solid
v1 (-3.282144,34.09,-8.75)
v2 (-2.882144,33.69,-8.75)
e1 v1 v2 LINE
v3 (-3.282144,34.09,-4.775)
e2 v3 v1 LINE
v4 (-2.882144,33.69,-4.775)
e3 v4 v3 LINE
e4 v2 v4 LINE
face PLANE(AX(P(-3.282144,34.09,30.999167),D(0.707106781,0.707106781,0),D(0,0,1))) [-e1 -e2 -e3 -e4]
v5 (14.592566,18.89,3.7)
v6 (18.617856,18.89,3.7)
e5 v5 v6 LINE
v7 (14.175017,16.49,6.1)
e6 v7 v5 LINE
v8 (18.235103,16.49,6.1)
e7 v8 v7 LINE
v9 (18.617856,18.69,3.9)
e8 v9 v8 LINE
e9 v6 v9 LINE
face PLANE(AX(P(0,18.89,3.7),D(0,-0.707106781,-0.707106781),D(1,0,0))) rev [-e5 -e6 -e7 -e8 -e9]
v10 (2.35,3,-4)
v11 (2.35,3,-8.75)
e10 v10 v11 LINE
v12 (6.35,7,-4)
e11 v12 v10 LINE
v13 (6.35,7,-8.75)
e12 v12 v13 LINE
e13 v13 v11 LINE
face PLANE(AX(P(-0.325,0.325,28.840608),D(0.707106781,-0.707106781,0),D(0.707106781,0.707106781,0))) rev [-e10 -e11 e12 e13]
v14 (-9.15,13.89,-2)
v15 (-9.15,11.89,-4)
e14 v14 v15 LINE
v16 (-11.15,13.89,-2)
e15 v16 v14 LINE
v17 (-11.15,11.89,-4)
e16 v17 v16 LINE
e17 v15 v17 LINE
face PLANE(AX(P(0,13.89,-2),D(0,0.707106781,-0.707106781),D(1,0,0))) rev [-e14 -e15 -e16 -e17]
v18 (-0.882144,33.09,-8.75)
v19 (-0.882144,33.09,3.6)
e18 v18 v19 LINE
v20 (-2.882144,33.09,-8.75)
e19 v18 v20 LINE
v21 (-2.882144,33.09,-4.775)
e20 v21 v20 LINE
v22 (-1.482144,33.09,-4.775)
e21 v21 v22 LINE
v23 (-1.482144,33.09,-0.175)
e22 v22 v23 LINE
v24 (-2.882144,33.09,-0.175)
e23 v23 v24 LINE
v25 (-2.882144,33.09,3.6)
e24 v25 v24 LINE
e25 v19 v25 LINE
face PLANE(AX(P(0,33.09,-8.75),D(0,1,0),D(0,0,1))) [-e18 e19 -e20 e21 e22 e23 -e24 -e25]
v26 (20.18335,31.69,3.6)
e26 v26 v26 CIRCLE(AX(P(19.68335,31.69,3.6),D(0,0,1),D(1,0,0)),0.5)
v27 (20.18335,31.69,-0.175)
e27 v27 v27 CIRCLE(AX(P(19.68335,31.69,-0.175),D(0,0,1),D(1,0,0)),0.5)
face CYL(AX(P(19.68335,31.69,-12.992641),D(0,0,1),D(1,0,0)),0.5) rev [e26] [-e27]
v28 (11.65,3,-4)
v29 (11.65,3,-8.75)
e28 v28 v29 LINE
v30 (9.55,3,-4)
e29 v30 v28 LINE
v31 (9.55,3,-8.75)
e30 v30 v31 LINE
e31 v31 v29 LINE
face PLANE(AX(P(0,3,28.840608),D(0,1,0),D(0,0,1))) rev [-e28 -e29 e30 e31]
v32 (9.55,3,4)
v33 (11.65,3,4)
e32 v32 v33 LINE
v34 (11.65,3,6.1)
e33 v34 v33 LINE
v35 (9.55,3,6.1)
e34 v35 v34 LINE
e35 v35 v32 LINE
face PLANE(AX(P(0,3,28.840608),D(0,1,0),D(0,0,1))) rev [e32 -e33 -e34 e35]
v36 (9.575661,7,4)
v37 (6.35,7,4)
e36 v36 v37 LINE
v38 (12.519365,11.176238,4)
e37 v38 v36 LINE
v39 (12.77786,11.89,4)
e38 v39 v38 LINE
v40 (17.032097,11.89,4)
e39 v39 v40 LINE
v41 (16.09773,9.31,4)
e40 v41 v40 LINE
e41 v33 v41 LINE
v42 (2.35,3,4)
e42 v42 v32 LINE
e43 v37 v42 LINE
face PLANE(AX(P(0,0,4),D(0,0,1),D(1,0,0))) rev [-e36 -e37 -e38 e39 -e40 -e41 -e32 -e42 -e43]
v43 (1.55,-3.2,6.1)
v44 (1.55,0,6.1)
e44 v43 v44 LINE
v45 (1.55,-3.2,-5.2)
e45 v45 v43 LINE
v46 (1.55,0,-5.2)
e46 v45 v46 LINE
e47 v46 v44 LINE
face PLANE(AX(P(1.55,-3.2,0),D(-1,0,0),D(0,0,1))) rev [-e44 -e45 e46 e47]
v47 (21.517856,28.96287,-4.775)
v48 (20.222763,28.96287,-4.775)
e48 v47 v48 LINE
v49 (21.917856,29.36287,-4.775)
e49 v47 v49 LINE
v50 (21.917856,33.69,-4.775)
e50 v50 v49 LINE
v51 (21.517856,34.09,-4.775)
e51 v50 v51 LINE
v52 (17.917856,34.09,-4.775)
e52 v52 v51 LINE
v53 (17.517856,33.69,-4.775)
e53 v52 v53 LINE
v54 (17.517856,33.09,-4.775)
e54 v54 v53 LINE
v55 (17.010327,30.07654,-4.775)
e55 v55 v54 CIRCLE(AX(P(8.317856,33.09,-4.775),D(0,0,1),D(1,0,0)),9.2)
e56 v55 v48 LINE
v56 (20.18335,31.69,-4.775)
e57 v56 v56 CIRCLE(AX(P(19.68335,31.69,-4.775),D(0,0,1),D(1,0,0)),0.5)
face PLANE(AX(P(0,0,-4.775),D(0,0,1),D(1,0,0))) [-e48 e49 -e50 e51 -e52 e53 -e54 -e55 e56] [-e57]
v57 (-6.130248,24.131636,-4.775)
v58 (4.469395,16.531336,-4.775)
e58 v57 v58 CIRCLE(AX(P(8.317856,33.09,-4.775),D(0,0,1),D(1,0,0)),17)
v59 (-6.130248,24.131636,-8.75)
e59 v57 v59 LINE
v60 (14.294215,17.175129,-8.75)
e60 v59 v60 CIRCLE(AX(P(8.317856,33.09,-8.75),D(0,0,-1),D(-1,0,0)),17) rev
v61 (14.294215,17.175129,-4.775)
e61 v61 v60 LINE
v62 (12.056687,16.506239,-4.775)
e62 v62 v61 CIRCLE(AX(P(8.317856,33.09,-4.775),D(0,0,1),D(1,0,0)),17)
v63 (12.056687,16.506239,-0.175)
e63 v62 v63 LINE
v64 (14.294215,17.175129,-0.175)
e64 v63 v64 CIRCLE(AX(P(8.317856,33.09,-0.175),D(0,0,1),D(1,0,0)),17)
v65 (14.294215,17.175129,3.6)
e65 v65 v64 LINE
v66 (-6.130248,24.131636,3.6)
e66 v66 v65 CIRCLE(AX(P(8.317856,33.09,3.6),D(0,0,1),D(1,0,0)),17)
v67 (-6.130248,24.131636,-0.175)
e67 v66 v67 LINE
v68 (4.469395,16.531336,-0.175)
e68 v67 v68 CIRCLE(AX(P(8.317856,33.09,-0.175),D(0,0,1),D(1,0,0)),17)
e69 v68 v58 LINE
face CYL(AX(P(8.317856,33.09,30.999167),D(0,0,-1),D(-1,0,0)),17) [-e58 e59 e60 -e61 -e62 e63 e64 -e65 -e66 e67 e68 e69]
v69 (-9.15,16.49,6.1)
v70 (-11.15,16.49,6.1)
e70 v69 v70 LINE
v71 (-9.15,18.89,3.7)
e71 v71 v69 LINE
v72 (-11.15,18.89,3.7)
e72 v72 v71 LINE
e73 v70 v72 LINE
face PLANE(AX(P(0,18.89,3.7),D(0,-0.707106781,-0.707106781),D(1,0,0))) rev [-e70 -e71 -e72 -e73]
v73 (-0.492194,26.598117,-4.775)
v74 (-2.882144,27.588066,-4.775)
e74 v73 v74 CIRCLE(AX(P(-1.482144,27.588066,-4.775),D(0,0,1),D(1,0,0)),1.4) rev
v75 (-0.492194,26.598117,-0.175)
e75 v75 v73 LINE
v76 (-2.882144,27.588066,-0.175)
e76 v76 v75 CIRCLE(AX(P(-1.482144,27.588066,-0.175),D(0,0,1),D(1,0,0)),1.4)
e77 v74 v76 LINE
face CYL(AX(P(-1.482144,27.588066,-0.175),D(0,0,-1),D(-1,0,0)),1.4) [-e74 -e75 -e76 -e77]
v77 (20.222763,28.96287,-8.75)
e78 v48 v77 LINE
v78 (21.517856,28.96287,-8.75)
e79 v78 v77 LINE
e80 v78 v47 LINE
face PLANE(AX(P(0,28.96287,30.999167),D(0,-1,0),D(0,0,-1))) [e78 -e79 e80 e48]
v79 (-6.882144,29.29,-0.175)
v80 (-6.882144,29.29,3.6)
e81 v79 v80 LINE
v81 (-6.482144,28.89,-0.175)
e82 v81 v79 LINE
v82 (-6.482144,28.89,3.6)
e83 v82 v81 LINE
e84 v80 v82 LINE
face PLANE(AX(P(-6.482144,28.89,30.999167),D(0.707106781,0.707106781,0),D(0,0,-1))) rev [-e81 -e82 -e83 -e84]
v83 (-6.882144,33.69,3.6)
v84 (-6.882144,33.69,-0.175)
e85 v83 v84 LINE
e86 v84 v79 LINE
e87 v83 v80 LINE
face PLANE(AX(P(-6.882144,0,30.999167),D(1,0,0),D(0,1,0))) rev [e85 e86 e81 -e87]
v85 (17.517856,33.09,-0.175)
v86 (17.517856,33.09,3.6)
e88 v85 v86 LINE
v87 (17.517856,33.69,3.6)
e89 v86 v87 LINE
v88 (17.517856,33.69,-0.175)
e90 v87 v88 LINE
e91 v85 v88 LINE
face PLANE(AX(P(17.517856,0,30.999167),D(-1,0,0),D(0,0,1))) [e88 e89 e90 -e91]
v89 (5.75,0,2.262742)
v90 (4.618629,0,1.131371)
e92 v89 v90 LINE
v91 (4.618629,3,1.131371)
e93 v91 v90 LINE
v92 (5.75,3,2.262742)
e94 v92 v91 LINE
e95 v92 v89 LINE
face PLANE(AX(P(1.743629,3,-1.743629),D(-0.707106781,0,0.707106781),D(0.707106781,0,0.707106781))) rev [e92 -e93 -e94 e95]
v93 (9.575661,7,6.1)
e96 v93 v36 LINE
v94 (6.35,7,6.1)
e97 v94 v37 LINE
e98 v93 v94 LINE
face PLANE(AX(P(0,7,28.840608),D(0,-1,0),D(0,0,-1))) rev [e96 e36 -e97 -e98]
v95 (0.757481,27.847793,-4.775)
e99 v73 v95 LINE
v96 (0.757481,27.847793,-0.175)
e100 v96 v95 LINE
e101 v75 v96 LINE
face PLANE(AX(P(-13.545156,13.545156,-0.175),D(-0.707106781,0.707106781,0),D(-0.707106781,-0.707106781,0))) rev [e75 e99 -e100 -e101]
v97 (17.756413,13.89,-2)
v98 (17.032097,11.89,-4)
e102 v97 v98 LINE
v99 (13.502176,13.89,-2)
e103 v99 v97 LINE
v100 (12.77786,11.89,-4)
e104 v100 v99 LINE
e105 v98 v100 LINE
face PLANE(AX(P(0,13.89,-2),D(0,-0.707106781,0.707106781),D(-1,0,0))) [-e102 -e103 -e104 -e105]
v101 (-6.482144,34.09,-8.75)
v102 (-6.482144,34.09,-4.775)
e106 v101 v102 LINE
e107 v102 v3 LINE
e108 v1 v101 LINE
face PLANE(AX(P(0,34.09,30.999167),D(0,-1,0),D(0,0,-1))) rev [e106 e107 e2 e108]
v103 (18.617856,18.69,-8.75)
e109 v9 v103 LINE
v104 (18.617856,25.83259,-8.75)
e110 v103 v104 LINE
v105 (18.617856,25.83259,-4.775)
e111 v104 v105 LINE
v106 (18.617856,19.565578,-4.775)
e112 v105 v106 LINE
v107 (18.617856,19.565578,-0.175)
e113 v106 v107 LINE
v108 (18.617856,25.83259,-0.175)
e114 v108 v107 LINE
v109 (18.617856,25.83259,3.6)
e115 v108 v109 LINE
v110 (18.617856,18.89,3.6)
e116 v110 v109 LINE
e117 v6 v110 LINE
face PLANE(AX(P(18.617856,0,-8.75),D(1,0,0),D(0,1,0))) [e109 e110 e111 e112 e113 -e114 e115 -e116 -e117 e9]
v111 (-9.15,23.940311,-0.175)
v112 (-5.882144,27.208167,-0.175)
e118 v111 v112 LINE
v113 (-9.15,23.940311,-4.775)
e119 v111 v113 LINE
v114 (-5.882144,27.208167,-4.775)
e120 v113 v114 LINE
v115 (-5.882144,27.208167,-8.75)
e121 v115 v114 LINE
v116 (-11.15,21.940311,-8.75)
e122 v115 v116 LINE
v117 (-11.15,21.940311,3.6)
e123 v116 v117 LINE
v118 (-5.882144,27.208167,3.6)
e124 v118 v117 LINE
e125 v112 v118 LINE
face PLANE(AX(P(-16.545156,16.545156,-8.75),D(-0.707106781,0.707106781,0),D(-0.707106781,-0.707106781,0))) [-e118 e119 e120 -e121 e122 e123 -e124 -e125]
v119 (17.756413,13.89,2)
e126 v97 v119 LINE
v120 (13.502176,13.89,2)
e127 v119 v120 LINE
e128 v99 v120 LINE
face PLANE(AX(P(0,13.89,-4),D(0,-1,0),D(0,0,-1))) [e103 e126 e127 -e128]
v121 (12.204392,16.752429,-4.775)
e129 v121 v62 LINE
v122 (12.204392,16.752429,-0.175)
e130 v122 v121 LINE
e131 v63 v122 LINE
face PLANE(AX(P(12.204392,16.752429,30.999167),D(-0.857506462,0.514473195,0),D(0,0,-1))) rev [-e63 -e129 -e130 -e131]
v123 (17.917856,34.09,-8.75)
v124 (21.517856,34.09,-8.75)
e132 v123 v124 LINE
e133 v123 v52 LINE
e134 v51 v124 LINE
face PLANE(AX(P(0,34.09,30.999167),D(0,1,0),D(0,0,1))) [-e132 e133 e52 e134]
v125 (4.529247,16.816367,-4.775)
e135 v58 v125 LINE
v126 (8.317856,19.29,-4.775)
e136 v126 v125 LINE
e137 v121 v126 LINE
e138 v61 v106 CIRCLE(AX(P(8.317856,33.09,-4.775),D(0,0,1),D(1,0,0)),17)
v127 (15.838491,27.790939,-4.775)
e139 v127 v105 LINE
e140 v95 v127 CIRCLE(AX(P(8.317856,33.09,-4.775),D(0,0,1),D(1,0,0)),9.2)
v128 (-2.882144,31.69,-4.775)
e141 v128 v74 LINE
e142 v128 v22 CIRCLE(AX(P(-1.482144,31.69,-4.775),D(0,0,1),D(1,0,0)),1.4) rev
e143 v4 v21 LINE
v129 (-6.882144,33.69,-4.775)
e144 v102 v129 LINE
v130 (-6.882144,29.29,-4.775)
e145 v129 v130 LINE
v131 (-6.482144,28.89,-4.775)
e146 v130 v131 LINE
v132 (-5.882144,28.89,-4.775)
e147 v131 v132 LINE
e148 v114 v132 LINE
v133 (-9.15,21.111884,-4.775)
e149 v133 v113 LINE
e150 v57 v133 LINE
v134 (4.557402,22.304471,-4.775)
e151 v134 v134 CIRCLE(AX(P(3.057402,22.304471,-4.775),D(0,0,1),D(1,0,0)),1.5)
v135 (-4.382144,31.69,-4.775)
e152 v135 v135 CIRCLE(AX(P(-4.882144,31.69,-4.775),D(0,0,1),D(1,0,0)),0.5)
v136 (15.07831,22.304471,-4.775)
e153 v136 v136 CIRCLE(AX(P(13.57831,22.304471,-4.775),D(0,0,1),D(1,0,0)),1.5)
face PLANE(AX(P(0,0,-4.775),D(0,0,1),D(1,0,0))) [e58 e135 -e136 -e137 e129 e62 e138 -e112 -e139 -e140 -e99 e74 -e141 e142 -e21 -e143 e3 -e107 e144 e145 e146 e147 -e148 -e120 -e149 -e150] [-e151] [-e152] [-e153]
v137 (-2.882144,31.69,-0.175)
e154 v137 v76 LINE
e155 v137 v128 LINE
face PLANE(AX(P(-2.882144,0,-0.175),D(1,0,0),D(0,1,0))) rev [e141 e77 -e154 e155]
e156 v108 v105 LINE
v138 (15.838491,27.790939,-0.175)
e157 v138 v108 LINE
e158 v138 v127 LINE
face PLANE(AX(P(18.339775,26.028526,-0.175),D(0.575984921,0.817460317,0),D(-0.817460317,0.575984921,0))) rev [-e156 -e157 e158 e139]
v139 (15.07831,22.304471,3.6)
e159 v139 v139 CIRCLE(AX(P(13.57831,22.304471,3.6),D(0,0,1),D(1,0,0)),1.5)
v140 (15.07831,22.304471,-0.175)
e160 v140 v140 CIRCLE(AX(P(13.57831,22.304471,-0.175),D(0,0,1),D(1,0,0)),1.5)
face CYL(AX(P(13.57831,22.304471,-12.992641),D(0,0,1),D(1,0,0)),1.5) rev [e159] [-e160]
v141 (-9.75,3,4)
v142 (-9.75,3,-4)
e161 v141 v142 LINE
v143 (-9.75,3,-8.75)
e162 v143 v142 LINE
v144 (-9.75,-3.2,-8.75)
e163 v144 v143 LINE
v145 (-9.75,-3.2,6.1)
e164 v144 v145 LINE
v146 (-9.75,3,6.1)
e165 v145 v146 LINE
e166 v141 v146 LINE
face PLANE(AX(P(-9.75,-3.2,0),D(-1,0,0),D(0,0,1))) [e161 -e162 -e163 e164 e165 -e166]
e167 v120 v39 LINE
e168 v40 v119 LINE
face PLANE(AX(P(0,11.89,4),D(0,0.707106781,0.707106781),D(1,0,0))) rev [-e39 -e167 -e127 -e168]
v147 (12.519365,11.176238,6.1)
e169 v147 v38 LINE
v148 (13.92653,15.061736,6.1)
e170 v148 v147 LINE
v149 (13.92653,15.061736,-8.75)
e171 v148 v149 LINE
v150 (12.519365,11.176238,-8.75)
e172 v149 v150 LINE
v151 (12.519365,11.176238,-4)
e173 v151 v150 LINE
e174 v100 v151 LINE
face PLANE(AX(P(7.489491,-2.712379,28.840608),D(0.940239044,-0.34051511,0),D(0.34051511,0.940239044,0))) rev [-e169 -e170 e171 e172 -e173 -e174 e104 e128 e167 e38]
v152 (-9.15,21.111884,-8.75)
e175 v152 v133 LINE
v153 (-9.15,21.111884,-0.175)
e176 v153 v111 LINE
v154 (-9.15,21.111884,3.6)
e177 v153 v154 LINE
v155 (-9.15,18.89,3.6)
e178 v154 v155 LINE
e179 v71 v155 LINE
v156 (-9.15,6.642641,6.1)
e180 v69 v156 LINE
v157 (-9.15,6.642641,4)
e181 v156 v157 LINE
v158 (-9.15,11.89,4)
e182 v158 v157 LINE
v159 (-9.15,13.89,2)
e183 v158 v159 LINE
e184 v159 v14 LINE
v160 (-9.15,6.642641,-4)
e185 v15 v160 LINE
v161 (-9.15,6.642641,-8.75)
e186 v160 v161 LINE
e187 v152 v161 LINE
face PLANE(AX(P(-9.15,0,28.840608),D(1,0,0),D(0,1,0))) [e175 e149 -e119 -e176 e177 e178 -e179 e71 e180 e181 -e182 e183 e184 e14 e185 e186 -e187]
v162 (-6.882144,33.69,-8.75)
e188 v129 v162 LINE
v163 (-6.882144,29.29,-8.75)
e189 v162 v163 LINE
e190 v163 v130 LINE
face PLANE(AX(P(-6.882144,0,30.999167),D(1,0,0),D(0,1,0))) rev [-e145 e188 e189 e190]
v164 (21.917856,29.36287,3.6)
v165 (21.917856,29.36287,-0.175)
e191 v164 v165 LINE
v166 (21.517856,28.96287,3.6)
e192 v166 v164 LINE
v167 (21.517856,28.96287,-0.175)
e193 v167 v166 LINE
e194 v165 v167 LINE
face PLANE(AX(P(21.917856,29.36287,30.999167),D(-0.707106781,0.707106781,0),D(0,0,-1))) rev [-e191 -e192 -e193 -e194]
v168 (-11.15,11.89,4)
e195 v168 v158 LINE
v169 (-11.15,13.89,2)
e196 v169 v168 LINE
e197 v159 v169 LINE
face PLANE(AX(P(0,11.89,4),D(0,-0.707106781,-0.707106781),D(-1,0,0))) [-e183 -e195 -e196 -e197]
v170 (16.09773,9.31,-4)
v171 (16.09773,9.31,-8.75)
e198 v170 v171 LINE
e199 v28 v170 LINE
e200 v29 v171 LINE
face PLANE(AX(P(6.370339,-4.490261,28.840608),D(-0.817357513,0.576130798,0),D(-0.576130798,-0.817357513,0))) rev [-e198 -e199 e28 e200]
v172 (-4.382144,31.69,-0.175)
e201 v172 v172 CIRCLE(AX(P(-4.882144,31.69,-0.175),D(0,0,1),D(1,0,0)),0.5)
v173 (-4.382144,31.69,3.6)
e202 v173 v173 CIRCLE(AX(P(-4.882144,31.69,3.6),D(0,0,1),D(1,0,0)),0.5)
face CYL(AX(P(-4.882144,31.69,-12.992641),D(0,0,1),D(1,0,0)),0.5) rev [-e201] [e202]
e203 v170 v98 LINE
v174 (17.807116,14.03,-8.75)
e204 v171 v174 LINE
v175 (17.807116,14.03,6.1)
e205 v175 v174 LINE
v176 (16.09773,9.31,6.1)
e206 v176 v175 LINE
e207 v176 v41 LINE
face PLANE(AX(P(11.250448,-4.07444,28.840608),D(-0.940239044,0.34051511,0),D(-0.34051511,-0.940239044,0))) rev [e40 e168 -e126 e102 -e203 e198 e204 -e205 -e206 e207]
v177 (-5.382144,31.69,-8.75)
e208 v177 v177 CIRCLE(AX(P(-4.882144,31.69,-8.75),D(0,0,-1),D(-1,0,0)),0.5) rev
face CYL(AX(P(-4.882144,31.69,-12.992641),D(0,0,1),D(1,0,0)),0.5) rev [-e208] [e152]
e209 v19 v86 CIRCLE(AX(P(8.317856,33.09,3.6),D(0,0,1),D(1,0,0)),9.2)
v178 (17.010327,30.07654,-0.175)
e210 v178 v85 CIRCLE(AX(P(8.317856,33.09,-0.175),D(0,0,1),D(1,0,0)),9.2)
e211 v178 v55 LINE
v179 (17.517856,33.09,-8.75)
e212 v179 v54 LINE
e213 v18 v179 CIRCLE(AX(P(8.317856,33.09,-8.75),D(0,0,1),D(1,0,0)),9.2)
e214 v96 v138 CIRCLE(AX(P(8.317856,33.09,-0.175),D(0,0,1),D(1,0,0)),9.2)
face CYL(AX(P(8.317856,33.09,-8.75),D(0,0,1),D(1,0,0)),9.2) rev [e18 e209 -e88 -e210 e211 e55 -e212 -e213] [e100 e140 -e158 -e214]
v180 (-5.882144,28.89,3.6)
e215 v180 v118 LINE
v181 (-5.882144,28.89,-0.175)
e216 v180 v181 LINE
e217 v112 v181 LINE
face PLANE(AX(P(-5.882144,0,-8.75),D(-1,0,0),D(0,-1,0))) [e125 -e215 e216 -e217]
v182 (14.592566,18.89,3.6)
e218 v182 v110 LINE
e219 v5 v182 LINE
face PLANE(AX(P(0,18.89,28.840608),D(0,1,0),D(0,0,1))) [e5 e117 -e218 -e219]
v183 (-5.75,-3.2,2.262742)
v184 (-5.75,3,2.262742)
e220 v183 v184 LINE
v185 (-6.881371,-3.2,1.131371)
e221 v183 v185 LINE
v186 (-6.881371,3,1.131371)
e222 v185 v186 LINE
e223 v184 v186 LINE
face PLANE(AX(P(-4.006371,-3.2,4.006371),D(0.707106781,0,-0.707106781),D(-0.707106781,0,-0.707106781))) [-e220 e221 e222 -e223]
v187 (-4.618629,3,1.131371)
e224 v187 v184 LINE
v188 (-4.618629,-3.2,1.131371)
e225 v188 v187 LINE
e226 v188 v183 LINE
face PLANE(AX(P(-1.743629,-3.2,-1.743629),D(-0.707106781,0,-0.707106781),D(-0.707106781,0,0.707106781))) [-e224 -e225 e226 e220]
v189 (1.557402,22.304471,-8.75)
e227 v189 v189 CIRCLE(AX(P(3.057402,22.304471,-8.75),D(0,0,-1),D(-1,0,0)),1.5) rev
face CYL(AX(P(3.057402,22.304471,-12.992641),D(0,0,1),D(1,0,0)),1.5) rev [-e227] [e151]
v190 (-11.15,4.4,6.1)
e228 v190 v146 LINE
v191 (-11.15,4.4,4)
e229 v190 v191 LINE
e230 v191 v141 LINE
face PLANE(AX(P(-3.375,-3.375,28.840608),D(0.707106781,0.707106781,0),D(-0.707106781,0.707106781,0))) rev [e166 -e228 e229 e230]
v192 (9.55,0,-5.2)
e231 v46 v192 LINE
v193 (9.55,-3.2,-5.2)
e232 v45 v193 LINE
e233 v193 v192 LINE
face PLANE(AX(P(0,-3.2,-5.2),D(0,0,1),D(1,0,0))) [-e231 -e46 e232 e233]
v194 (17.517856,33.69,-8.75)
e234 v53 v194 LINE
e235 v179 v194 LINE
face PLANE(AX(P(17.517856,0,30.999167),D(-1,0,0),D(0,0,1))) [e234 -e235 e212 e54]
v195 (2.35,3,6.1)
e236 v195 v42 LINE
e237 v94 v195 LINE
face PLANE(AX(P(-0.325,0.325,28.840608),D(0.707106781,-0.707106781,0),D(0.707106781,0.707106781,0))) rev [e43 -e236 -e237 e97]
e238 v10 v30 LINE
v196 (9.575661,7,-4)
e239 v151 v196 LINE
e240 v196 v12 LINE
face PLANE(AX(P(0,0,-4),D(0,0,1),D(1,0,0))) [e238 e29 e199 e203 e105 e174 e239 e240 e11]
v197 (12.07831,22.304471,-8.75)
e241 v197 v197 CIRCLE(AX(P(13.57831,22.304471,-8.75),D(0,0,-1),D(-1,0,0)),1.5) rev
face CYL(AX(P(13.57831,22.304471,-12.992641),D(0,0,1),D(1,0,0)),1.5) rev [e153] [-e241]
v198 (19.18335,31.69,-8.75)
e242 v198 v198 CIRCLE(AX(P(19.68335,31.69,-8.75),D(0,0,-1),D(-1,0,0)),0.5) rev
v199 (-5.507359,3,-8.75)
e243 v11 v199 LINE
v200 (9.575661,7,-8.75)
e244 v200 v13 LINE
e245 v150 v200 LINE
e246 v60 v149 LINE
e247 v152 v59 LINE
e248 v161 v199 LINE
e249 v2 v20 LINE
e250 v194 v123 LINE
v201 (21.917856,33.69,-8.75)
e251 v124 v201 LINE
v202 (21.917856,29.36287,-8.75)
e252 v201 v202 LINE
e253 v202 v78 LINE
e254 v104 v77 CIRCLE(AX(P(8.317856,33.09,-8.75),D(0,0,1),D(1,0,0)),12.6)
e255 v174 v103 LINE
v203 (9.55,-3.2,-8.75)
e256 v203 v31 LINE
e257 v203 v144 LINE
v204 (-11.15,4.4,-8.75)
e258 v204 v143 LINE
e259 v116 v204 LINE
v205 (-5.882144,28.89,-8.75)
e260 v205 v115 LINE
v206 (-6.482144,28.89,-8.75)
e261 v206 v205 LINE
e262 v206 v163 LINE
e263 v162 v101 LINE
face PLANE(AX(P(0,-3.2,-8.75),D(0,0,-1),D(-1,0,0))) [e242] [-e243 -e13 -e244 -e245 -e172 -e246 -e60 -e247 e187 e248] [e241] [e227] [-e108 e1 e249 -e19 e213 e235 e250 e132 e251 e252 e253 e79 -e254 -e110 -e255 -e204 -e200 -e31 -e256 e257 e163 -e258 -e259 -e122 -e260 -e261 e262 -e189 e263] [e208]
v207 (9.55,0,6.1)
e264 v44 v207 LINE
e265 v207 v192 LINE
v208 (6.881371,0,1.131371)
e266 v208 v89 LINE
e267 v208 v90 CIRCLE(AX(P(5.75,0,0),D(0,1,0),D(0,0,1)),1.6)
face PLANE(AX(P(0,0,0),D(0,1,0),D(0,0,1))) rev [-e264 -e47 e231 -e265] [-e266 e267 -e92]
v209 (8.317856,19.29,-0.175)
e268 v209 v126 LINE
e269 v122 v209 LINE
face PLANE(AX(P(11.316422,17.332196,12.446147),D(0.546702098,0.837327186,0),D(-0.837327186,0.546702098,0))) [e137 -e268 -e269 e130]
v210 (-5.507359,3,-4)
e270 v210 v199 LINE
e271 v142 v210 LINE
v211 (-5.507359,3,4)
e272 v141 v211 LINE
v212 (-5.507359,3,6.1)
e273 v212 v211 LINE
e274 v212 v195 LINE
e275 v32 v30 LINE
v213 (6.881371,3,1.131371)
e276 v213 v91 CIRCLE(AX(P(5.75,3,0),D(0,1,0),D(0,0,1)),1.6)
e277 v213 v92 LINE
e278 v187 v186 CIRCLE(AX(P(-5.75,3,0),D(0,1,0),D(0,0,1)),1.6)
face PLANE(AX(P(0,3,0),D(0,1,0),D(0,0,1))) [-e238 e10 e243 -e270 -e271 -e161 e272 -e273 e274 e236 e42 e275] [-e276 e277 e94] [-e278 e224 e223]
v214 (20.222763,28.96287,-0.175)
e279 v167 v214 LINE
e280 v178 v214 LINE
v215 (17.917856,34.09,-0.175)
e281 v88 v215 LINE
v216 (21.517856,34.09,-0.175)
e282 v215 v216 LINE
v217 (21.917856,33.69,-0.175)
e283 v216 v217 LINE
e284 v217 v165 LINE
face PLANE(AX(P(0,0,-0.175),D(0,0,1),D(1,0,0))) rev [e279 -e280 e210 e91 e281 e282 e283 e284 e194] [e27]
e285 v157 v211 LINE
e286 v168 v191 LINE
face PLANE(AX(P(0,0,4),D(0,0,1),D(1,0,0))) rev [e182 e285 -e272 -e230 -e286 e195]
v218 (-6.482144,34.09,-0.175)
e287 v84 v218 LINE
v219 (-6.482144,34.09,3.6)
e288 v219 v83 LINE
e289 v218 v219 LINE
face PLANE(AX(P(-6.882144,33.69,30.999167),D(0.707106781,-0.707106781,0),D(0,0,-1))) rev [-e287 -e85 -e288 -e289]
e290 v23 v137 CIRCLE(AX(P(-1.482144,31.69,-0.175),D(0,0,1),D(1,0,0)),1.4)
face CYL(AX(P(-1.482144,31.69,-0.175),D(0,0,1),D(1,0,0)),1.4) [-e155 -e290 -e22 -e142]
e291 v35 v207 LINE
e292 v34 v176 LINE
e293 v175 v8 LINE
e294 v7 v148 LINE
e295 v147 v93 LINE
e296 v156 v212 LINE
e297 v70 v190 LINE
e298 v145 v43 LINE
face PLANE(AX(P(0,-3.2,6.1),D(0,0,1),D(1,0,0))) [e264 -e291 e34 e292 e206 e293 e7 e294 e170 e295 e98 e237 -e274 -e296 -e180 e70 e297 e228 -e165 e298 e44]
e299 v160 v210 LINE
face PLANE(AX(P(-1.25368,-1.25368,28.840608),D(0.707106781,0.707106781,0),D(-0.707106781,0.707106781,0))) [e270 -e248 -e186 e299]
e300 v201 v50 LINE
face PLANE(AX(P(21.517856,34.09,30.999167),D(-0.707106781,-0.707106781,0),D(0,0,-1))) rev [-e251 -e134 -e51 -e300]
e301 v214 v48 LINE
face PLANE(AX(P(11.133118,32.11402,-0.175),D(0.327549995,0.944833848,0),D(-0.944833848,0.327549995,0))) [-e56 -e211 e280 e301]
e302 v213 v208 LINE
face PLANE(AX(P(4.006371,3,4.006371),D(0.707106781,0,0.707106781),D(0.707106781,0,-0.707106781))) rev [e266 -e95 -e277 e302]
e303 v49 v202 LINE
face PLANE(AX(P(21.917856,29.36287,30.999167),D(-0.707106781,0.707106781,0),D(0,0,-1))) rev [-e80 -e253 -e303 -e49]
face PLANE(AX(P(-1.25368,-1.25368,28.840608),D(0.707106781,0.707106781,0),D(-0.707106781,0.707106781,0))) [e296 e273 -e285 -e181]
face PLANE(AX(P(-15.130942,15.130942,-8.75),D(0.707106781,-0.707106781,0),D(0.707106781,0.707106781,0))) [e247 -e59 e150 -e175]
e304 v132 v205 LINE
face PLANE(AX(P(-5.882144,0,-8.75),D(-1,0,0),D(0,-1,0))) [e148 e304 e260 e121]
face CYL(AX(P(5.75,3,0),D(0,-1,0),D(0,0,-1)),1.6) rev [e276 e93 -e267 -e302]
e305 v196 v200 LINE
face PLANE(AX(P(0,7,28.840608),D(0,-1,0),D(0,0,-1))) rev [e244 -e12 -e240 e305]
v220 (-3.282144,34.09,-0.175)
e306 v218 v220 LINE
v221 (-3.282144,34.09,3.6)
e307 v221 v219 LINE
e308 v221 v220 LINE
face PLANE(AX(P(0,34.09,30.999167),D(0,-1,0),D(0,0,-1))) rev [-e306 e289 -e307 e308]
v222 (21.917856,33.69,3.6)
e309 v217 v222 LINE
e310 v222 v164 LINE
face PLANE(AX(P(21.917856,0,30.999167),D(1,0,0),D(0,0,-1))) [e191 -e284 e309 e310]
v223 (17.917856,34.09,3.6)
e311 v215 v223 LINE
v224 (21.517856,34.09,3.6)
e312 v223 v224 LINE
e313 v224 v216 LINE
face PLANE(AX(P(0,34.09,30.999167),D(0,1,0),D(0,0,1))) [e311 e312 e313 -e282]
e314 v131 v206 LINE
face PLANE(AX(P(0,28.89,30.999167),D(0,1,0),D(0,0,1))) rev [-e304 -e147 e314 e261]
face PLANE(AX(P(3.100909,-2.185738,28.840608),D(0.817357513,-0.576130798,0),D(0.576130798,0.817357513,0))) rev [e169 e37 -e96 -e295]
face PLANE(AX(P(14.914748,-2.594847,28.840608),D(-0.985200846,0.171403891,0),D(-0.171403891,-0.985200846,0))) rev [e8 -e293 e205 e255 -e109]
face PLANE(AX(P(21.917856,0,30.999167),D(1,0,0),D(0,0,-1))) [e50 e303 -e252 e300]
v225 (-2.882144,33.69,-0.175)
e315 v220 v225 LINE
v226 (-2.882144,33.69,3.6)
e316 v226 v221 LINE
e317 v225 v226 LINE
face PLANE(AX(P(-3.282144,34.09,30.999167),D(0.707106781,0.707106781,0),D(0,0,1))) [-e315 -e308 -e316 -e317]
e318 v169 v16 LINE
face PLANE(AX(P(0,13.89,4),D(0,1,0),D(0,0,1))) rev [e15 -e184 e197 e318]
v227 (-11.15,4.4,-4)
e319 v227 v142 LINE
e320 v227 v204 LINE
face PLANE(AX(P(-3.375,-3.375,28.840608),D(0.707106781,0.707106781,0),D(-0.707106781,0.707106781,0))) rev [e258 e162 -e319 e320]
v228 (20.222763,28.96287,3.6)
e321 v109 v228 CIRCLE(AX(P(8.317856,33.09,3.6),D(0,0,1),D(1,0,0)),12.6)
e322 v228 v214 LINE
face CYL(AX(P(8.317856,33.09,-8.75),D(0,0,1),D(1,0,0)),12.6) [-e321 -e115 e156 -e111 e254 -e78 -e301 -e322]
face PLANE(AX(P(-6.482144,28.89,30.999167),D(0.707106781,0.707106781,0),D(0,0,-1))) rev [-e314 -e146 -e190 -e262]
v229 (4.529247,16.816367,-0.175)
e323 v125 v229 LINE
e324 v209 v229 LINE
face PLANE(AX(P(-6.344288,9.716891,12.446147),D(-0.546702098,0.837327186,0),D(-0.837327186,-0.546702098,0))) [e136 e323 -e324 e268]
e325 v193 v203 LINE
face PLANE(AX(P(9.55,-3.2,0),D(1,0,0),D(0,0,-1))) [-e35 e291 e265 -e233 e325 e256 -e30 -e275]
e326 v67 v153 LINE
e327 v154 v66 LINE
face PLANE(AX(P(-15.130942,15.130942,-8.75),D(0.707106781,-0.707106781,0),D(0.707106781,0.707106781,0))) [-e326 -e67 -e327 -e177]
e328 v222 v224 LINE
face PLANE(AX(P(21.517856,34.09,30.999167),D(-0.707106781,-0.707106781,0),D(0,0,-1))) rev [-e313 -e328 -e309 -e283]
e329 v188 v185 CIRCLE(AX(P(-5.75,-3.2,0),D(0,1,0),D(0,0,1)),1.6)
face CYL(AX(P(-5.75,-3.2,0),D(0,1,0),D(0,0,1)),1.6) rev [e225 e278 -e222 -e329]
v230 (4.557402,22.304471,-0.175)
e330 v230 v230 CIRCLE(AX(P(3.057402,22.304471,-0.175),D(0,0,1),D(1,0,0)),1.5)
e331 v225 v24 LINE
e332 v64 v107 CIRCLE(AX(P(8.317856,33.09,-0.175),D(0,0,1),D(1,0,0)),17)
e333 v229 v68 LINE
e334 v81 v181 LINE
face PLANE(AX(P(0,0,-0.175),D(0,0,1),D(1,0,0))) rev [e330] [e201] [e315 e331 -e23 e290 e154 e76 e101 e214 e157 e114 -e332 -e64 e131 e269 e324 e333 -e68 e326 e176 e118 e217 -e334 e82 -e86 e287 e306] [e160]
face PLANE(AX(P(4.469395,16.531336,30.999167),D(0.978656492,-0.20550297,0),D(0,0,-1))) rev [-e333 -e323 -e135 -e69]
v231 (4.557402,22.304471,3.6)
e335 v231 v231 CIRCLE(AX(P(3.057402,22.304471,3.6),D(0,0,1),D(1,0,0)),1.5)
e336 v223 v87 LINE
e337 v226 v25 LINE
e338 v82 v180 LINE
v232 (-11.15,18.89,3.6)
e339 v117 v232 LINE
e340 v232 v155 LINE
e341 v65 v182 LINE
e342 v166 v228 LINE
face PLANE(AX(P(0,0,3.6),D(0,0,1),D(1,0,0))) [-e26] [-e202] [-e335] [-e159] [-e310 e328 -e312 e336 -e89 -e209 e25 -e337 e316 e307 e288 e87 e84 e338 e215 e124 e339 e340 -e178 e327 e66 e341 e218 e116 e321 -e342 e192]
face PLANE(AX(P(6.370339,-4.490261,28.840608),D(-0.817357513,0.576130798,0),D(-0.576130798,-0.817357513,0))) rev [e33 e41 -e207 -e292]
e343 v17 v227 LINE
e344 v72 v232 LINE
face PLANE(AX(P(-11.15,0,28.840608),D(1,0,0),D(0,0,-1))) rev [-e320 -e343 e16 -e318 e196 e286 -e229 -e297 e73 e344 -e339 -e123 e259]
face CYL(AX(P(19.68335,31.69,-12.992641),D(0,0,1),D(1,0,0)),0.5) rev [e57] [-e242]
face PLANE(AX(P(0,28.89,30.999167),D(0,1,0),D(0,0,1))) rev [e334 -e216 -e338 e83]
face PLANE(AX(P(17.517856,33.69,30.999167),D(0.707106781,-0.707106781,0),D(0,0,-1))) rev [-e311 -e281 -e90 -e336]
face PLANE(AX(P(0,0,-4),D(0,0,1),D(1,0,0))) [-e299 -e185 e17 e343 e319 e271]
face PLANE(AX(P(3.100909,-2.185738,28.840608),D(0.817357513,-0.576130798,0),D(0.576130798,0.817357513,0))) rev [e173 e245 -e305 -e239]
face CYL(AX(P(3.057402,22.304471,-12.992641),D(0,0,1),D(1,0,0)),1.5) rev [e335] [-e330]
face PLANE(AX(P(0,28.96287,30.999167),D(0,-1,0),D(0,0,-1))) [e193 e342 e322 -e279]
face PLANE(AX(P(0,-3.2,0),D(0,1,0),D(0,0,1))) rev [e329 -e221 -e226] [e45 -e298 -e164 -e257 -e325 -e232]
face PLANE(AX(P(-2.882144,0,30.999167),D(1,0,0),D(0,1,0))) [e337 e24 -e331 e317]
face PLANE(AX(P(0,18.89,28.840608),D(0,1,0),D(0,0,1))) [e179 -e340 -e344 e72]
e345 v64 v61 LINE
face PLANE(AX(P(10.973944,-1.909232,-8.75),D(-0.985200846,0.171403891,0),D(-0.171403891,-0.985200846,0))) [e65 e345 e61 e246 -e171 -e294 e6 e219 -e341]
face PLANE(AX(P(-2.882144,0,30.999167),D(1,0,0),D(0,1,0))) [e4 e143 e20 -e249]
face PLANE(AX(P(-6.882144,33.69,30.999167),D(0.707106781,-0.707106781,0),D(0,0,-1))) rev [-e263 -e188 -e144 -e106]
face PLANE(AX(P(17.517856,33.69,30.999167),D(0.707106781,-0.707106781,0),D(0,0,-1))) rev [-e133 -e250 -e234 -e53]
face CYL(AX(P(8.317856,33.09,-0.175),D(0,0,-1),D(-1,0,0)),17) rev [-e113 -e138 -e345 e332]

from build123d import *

# Parameters (mm, degrees)
BOSS_EXTRUDE1_DEPTH             = 3.2
BOSS_EXTRUDE2_START             = 3
SKETCH1_3_W                     = 19.3
SKETCH1_3_H                     = 14.85
BOSS_EXTRUDE2_DEPTH             = 3
BOSS_EXTRUDE3_DEPTH             = 3.6
BOSS_EXTRUDE3_DEPTH_BACK        = 8.75
BOSS_EXTRUDE4_REACH             = 42.113
BOSS_EXTRUDE4_DIRECTION_2_REACH = 42.113
CHAMFER1_SIZE                   = 2.4
CUT_EXTRUDE1_DEPTH              = 4
CUT_EXTRUDE1_DEPTH_BACK         = 4
CHAMFER2_SIZE                   = 2
BOSS_EXTRUDE5_START             = -6.175
BOSS_EXTRUDE5_DEPTH             = 12.35
CUT_EXTRUDE2_START              = -2.2
CUT_EXTRUDE2_OUTLINE_R          = 0.5
CUT_EXTRUDE2_DEPTH              = 4.6
CUT_EXTRUDE3_START              = -6.175
SKETCH4_5_R                     = 1.5
SKETCH4_5_R_2                   = 0.5
CUT_EXTRUDE3_DEPTH              = 12.35
BOSS_EXTRUDE6_REACH             = 43.446
BOSS_EXTRUDE6_DIRECTION_2_REACH = 43.446
FILLET1_R                       = 1.4
CHAMFER3_SIZE                   = 0.4
CHAMFER3_SIZE_2                 = 0.283047342


with BuildPart() as part:
    # Sketch1 → Boss-Extrude1 (new body)
    with BuildSketch(Plane(origin=(0, 0, 0), x_dir=(1, 0, 0), z_dir=(0, 1, 0))):
        Polygon((-9.75, 8.75), (-9.75, -6.1), (1.55, -6.1), (1.55, 5.2), (9.55, 5.2), (9.55, 8.75), align=None)
        with BuildLine():
            Line((-4.61862915, -1.13137085), (-5.75, -2.2627417))
            Line((-5.75, -2.2627417), (-6.88137085, -1.13137085))
            ThreePointArc((-6.88137085, -1.13137085), (-5.75, 1.6), (-4.61862915, -1.13137085))
        make_face(mode=Mode.SUBTRACT)
    extrude(amount=-BOSS_EXTRUDE1_DEPTH)

    # Sketch1<3> → Boss-Extrude2 (add)
    with BuildSketch(Plane(origin=(0, 0, 0), x_dir=(1, 0, 0), z_dir=(0, 1, 0)).offset(BOSS_EXTRUDE2_START)):
        with Locations((-0.1, 1.325)):
            Rectangle(SKETCH1_3_W, SKETCH1_3_H)
        with BuildLine():
            Line((-4.61862915, -1.13137085), (-5.75, -2.2627417))
            Line((-5.75, -2.2627417), (-6.88137085, -1.13137085))
            ThreePointArc((-6.88137085, -1.13137085), (-5.75, 1.6), (-4.61862915, -1.13137085))
        make_face(mode=Mode.SUBTRACT)
        with BuildLine():
            Line((6.88137085, -1.13137085), (5.75, -2.2627417))
            Line((5.75, -2.2627417), (4.61862915, -1.13137085))
            ThreePointArc((4.61862915, -1.13137085), (5.75, 1.6), (6.88137085, -1.13137085))
        make_face(mode=Mode.SUBTRACT)
    extrude(amount=-BOSS_EXTRUDE2_DEPTH)

    # Boss-Extrude4: up to this face of the body (flat: up to its plane)
    boss_extrude4_end = Plane(part.part.faces().sort_by_distance((-1.637741867, 0.308250053, 6.1))[0])
    # Sketch2<3> → Boss-Extrude4 (add, up to the picked face)
    with BuildSketch(Plane.XY, mode=Mode.PRIVATE) as boss_extrude4_sk1:
        Polygon((9.575660702, 7), (6.35, 7), (2.35, 3), (11.65, 3), (16.097729758, 9.31), (17.807115613, 14.03), (18.617856015, 18.69), (18.617856015, 18.89), (14.592565903, 18.89), (13.926529786, 15.061735984), (12.519365433, 11.176237735), align=None)
    boss_extrude4_tool1 = split(extrude(boss_extrude4_sk1.sketch, amount=BOSS_EXTRUDE4_REACH, mode=Mode.PRIVATE), bisect_by=boss_extrude4_end, keep=Keep.BOTH, mode=Mode.PRIVATE)
    # Sketch2<3> → Boss-Extrude4 (add, up to the picked face)
    with BuildSketch(Plane.XY, mode=Mode.PRIVATE) as boss_extrude4_sk2:
        Polygon((-11.15, 18.89), (-11.15, 4.4), (-9.75, 3), (-5.507359313, 3), (-9.15, 6.642640687), (-9.15, 18.89), align=None)
    boss_extrude4_tool2 = split(extrude(boss_extrude4_sk2.sketch, amount=BOSS_EXTRUDE4_REACH, mode=Mode.PRIVATE), bisect_by=boss_extrude4_end, keep=Keep.BOTH, mode=Mode.PRIVATE)


with BuildPart() as body_2:
    # Sketch2 → Boss-Extrude3 (new, two sides: drawn at the far end of the back side and taken through both)
    with BuildSketch(Plane.XY.offset(-BOSS_EXTRUDE3_DEPTH_BACK)):
        with BuildLine():
            ThreePointArc((-1.723060387, 23.049083817), (6.015471186, 19.077897228), (14.617856015, 20.364042276))
            Line((14.617856015, 20.364042276), (14.617856015, 19.035363324))
            Line((14.617856015, 19.035363324), (14.592565903, 18.89))
            Line((14.592565903, 18.89), (18.617856015, 18.89))
            Line((18.617856015, 18.89), (18.617856015, 25.832589994))
            ThreePointArc((18.617856015, 25.832589994), (20.329100746, 29.283426738), (20.917856015, 33.09))
            Line((20.917856015, 33.09), (17.517856015, 33.09))
            ThreePointArc((17.517856015, 33.09), (8.317856015, 23.89), (-0.882143985, 33.09))
            Line((-0.882143985, 33.09), (-5.882143985, 33.09))
            Line((-5.882143985, 33.09), (-5.882143985, 27.208167414))
            Line((-5.882143985, 27.208167414), (-11.15, 21.940311399))
            Line((-11.15, 21.940311399), (-11.15, 18.89))
            Line((-11.15, 18.89), (-9.15, 18.89))
            Line((-9.15, 18.89), (-9.15, 21.111884275))
            Line((-9.15, 21.111884275), (-4.467930423, 25.793953852))
            Line((-4.467930423, 25.793953852), (-1.723060387, 23.049083817))
        make_face()
    extrude(amount=BOSS_EXTRUDE3_DEPTH + BOSS_EXTRUDE3_DEPTH_BACK)


with BuildPart() as part_1:
    add(part.part)

    add(body_2.part)  # Boss-Extrude4 merges body 2
    add(boss_extrude4_tool1.solids().sort_by(Axis((12.380692, 9.593109, 0), (0, 0, 1)))[0])
    add(boss_extrude4_tool2.solids().sort_by(Axis((-9.743618, 9.947894, 0), (0, 0, 1)))[0])

    # Boss-Extrude4 direction 2: up to this face of the body (flat: up to its plane)
    boss_extrude4_direction_2_end = Plane(part_1.part.faces().sort_by_distance((-0.1, -0.1, -8.75))[0])
    # Sketch2<3> → Boss-Extrude4 direction 2 (add, up to the picked face)
    with BuildSketch(Plane.XY, mode=Mode.PRIVATE) as boss_extrude4_direction_2_sk1:
        Polygon((9.575660702, 7), (6.35, 7), (2.35, 3), (11.65, 3), (16.097729758, 9.31), (17.807115613, 14.03), (18.617856015, 18.69), (18.617856015, 18.89), (14.592565903, 18.89), (13.926529786, 15.061735984), (12.519365433, 11.176237735), align=None)
    boss_extrude4_direction_2_tool1 = split(extrude(boss_extrude4_direction_2_sk1.sketch, amount=-BOSS_EXTRUDE4_DIRECTION_2_REACH, mode=Mode.PRIVATE), bisect_by=boss_extrude4_direction_2_end, keep=Keep.BOTH, mode=Mode.PRIVATE)
    # Sketch2<3> → Boss-Extrude4 direction 2 (add, up to the picked face)
    with BuildSketch(Plane.XY, mode=Mode.PRIVATE) as boss_extrude4_direction_2_sk2:
        Polygon((-11.15, 18.89), (-11.15, 4.4), (-9.75, 3), (-5.507359313, 3), (-9.15, 6.642640687), (-9.15, 18.89), align=None)
    boss_extrude4_direction_2_tool2 = split(extrude(boss_extrude4_direction_2_sk2.sketch, amount=-BOSS_EXTRUDE4_DIRECTION_2_REACH, mode=Mode.PRIVATE), bisect_by=boss_extrude4_direction_2_end, keep=Keep.BOTH, mode=Mode.PRIVATE)
    add(boss_extrude4_direction_2_tool1.solids().sort_by(Axis((12.380692, 9.593109, 0), (0, 0, -1)))[0])
    add(boss_extrude4_direction_2_tool2.solids().sort_by(Axis((-9.743618, 9.947894, 0), (0, 0, -1)))[0])

    # Chamfer1
    chamfer1_edges = [part_1.edges().sort_by_distance(p)[0] for p in [
        (-10.15, 18.89, 6.1),
        (16.605210959, 18.89, 6.1),
    ]]
    chamfer(chamfer1_edges, length=CHAMFER1_SIZE)

    # Sketch2<5> → Cut-Extrude1 (cut, two sides: drawn at the far end of the back side and taken through both)
    with BuildSketch(Plane.XY.offset(-CUT_EXTRUDE1_DEPTH_BACK)):
        Polygon((9.575660702, 7), (6.35, 7), (2.35, 3), (11.65, 3), (16.097729758, 9.31), (17.75641349, 13.89), (13.502176202, 13.89), (12.519365433, 11.176237735), align=None)
        Polygon((-9.15, 6.642640687), (-9.15, 13.89), (-11.15, 13.89), (-11.15, 4.4), (-9.75, 3), (-5.507359313, 3), align=None)
    extrude(amount=CUT_EXTRUDE1_DEPTH + CUT_EXTRUDE1_DEPTH_BACK, mode=Mode.SUBTRACT)

    # Chamfer2
    chamfer2_edges = [part_1.edges().sort_by_distance(p)[0] for p in [
        (15.629294846, 13.89, 4),
        (15.629294846, 13.89, -4),
        (-10.15, 13.89, 4),
        (-10.15, 13.89, -4),
    ]]
    chamfer(chamfer2_edges, length=CHAMFER2_SIZE)

    # Boss-Extrude5: read off the stored shape, not the designer's step
    # Boss-Extrude5 outline → Boss-Extrude5 (add)
    with BuildSketch(Plane.XY.offset(-2.575).offset(BOSS_EXTRUDE5_START)):
        Polygon((-6.882143985, 34.09), (-6.882143985, 28.89), (-5.882143985, 28.89), (-5.882143985, 33.09), (-2.882143985, 33.09), (-2.882143985, 34.09), align=None)
        with BuildLine():
            Line((21.917856015, 28.962870062), (21.917856015, 34.09))
            Line((21.917856015, 34.09), (17.517856015, 34.09))
            Line((17.517856015, 34.09), (17.517856015, 33.09))
            Line((17.517856015, 33.09), (20.917856015, 33.09))
            ThreePointArc((20.917856015, 33.09), (20.742867518, 30.997372673), (20.222762502, 28.962870062))
            Line((20.222762502, 28.962870062), (21.917856015, 28.962870062))
        make_face()
        with BuildLine():
            ThreePointArc((-6.130248208, 24.131636067), (2.836901124, 16.997792771), (14.294214917, 17.175128519))
            Line((14.294214917, 17.175128519), (14.617856015, 19.035363324))
            Line((14.617856015, 19.035363324), (14.617856015, 20.364042276))
            ThreePointArc((14.617856015, 20.364042276), (6.015471262, 19.077897215), (-1.723060278, 23.049083707))
            Line((-1.723060278, 23.049083707), (-4.467930423, 25.793953852))
            Line((-4.467930423, 25.793953852), (-6.130248208, 24.131636067))
        make_face()
    extrude(amount=BOSS_EXTRUDE5_DEPTH)

    # Cut-Extrude2: read off the stored shape, not the designer's step
    # Cut-Extrude2 outline → Cut-Extrude2 (cut)
    # profile 1 of 2: a face of its own
    with BuildSketch(Plane.XY.offset(-2.575).offset(CUT_EXTRUDE2_START)):
        with BuildLine():
            ThreePointArc((17.517856015, 33.09), (17.390086637, 31.562049888), (17.010327418, 30.076540045))
            Line((17.010327418, 30.076540045), (20.222762502, 28.962870062))
            Line((20.222762502, 28.962870062), (21.917856015, 28.962870062))
            Line((21.917856015, 28.962870062), (21.917856015, 34.09))
            Line((21.917856015, 34.09), (17.517856015, 34.09))
            Line((17.517856015, 34.09), (17.517856015, 33.09))
        make_face()
        with Locations((19.68334966, 31.69)):
            Circle(CUT_EXTRUDE2_OUTLINE_R, mode=Mode.SUBTRACT)
    # profile 2 of 2: a face of its own
    with BuildSketch(Plane.XY.offset(-2.575).offset(CUT_EXTRUDE2_START)):
        with BuildLine():
            Line((-9.15, 23.940311399), (-9.15, 21.111884275))
            Line((-9.15, 21.111884275), (-6.130248208, 24.131636067))
            ThreePointArc((-6.130248208, 24.131636067), (2.836901124, 16.997792771), (14.294214917, 17.175128519))
            ThreePointArc((14.294214917, 17.175128519), (16.543336338, 18.21245069), (18.617856015, 19.565577646))
            Line((18.617856015, 19.565577646), (18.617856015, 25.832589994))
            Line((18.617856015, 25.832589994), (15.838490936, 27.790938726))
            ThreePointArc((15.838490936, 27.790938726), (8.283173059, 23.890065376), (0.757481426, 27.847792825))
            Line((0.757481426, 27.847792825), (-2.882143985, 24.208167414))
            Line((-2.882143985, 24.208167414), (-2.882143985, 34.09))
            Line((-2.882143985, 34.09), (-6.882143985, 34.09))
            Line((-6.882143985, 34.09), (-6.882143985, 28.89))
            Line((-6.882143985, 28.89), (-5.882143985, 28.89))
            Line((-5.882143985, 28.89), (-5.882143985, 27.208167414))
            Line((-5.882143985, 27.208167414), (-9.15, 23.940311399))
        make_face()
        with Locations((-4.882143985, 31.69)):
            Circle(CUT_EXTRUDE2_OUTLINE_R, mode=Mode.SUBTRACT)
    extrude(amount=CUT_EXTRUDE2_DEPTH, mode=Mode.SUBTRACT)

    # Sketch4<5> → Cut-Extrude3 (cut)
    with BuildSketch(Plane.XY.offset(-2.575).offset(CUT_EXTRUDE3_START)):
        with Locations((3.057402253, 22.304471444)):
            Circle(SKETCH4_5_R)
        with Locations((13.578309776, 22.304471444)):
            Circle(SKETCH4_5_R)
        with Locations((-4.882143985, 31.69)):
            Circle(SKETCH4_5_R_2)
        with Locations((19.68334966, 31.69)):
            Circle(SKETCH4_5_R_2)
    extrude(amount=CUT_EXTRUDE3_DEPTH, mode=Mode.SUBTRACT)

    # Boss-Extrude6: up to this face of the body (flat: up to its plane)
    boss_extrude6_end = Plane(part_1.part.faces().sort_by_distance((5.571215805, 24.148263907, 3.6))[0])
    # Sketch4<6> → Boss-Extrude6 (add, up to the picked face)
    with BuildSketch(Plane.XY.offset(-2.575), mode=Mode.PRIVATE) as boss_extrude6_sk1:
        with BuildLine():
            ThreePointArc((4.194316475, 16.597685982), (4.495824105, 16.525215906), (4.798603438, 16.458257419))
            ThreePointArc((4.798603438, 16.458257419), (8.627937882, 16.092828199), (12.441395555, 16.597685982))
            Line((12.441395555, 16.597685982), (8.317856015, 19.29))
            Line((8.317856015, 19.29), (4.194316475, 16.597685982))
        make_face()
    boss_extrude6_tool1 = split(extrude(boss_extrude6_sk1.sketch, amount=BOSS_EXTRUDE6_REACH, mode=Mode.PRIVATE), bisect_by=boss_extrude6_end, keep=Keep.BOTH, mode=Mode.PRIVATE)
    add(boss_extrude6_tool1.solids().sort_by(Axis((8.317856, 17.273432, -2.575), (0, 0, 1)))[0])

    # Boss-Extrude6 direction 2: up to this face of the body (flat: up to its plane)
    boss_extrude6_direction_2_end = Plane(part_1.part.faces().sort_by_distance((-0.1, -2.701599839, -8.75))[0])
    # Sketch4<6> → Boss-Extrude6 direction 2 (add, up to the picked face)
    with BuildSketch(Plane.XY.offset(-2.575), mode=Mode.PRIVATE) as boss_extrude6_direction_2_sk1:
        with BuildLine():
            ThreePointArc((4.194316475, 16.597685982), (4.495824105, 16.525215906), (4.798603438, 16.458257419))
            ThreePointArc((4.798603438, 16.458257419), (8.627937882, 16.092828199), (12.441395555, 16.597685982))
            Line((12.441395555, 16.597685982), (8.317856015, 19.29))
            Line((8.317856015, 19.29), (4.194316475, 16.597685982))
        make_face()
    boss_extrude6_direction_2_tool1 = split(extrude(boss_extrude6_direction_2_sk1.sketch, amount=-BOSS_EXTRUDE6_DIRECTION_2_REACH, mode=Mode.PRIVATE), bisect_by=boss_extrude6_direction_2_end, keep=Keep.BOTH, mode=Mode.PRIVATE)
    add(boss_extrude6_direction_2_tool1.solids().sort_by(Axis((8.317856, 17.273432, -2.575), (0, 0, -1)))[0])

    # Fillet1
    fillet1_edges = [part_1.edges().sort_by_distance(p)[0] for p in [
        (-2.882143985, 33.09, -2.475),
        (-2.882143985, 24.208167414, -2.475),
    ]]
    fillet(fillet1_edges, radius=FILLET1_R)

    # Chamfer3
    # the kernel refuses this chamfer: 0.4, 0.283047342 mm, written as the material it takes off along each edge
    with BuildSketch(Plane(origin=(-6.882143985, 34.09, -1.203673195), x_dir=(1, 0, 0), z_dir=(0, 0, 1)), Plane(origin=(-6.882143985, 28.89, -1.203673195), x_dir=(0, 1, 0), z_dir=(0, 0, 1)), Plane(origin=(-2.882143985, 34.09, -1.203673195), x_dir=(0, -1, 0), z_dir=(0, 0, 1)), Plane(origin=(21.917856015, 28.962870062, -1.203673195), x_dir=(-1, 0, 0), z_dir=(0, 0, 1))) as chamfer3_piece_1:
        Polygon((CHAMFER3_SIZE, 0), (0, -CHAMFER3_SIZE), (0, 0), align=None)
    extrude(amount=5.83234639, mode=Mode.SUBTRACT)
    with BuildSketch(Plane(origin=(17.517856015, 34.09, -1.203673195), x_dir=(0, -1, 0), z_dir=(0, 0, 1)), Plane(origin=(21.917856015, 34.09, -1.203673195), x_dir=(-1, 0, 0), z_dir=(0, 0, 1))) as chamfer3_piece_2:
        Polygon((CHAMFER3_SIZE, 0), (0, CHAMFER3_SIZE), (0, 0), align=None)
    extrude(amount=5.83234639, mode=Mode.SUBTRACT)
    with BuildSketch(Plane(origin=(21.917856015, 34.09, -9.778673195), x_dir=(0, -1, 0), z_dir=(0, 0, 1)), Plane(origin=(21.917856015, 28.962870062, -9.778673195), x_dir=(-1, 0, 0), z_dir=(0, 0, 1)), Plane(origin=(-2.882143985, 34.09, -9.778673195), x_dir=(0, -1, 0), z_dir=(0, 0, 1)), Plane(origin=(-6.882143985, 34.09, -9.778673195), x_dir=(1, 0, 0), z_dir=(0, 0, 1)), Plane(origin=(-6.882143985, 28.89, -9.778673195), x_dir=(0, 1, 0), z_dir=(0, 0, 1))) as chamfer3_piece_3:
        Polygon((CHAMFER3_SIZE, 0), (0, -CHAMFER3_SIZE), (0, 0), align=None)
    extrude(amount=6.03234639, mode=Mode.SUBTRACT)
    with BuildSketch(Plane(origin=(17.517856015, 34.09, -9.778673195), x_dir=(0, -1, 0), z_dir=(0, 0, 1))) as chamfer3_piece_4:
        Polygon((CHAMFER3_SIZE, 0), (0, CHAMFER3_SIZE), (0, 0), align=None)
    extrude(amount=6.03234639, mode=Mode.SUBTRACT)
    with BuildSketch(Plane(origin=(12.441395555, 16.597685982, -4.775), x_dir=(-0.9728915471161905, -0.2312618376426714, 0), z_dir=(0, 0, 1))) as chamfer3_piece_5:
        with BuildLine():
            Line((0.395427827, 0), (CHAMFER3_SIZE_2 * 0.688197210092, -CHAMFER3_SIZE_2 * 0.725523674515))
            Line((CHAMFER3_SIZE_2 * 0.688197210092, -CHAMFER3_SIZE_2 * 0.725523674515), (0, 0))
            ThreePointArc((0, 0), (0.203303091, 0.001148849), (0.395427827, 0))
        make_face()
    extrude(amount=4.6, mode=Mode.SUBTRACT)
    with BuildSketch(Plane(origin=(4.194316475, 16.597685982, -0.175), x_dir=(0.972121252868909, -0.23447871912091042, 0), z_dir=(0, 0, -1))) as chamfer3_piece_6:
        with BuildLine():
            Line((0.282967544, 0), (CHAMFER3_SIZE * 0.685793544933, -CHAMFER3_SIZE * 0.7277961353))
            Line((CHAMFER3_SIZE * 0.685793544933, -CHAMFER3_SIZE * 0.7277961353), (0, 0))
            ThreePointArc((0, 0), (0.141721271, 0.000588763), (0.282967544, 0))
        make_face()
    extrude(amount=4.6, mode=Mode.SUBTRACT)


solid = part_1.part
